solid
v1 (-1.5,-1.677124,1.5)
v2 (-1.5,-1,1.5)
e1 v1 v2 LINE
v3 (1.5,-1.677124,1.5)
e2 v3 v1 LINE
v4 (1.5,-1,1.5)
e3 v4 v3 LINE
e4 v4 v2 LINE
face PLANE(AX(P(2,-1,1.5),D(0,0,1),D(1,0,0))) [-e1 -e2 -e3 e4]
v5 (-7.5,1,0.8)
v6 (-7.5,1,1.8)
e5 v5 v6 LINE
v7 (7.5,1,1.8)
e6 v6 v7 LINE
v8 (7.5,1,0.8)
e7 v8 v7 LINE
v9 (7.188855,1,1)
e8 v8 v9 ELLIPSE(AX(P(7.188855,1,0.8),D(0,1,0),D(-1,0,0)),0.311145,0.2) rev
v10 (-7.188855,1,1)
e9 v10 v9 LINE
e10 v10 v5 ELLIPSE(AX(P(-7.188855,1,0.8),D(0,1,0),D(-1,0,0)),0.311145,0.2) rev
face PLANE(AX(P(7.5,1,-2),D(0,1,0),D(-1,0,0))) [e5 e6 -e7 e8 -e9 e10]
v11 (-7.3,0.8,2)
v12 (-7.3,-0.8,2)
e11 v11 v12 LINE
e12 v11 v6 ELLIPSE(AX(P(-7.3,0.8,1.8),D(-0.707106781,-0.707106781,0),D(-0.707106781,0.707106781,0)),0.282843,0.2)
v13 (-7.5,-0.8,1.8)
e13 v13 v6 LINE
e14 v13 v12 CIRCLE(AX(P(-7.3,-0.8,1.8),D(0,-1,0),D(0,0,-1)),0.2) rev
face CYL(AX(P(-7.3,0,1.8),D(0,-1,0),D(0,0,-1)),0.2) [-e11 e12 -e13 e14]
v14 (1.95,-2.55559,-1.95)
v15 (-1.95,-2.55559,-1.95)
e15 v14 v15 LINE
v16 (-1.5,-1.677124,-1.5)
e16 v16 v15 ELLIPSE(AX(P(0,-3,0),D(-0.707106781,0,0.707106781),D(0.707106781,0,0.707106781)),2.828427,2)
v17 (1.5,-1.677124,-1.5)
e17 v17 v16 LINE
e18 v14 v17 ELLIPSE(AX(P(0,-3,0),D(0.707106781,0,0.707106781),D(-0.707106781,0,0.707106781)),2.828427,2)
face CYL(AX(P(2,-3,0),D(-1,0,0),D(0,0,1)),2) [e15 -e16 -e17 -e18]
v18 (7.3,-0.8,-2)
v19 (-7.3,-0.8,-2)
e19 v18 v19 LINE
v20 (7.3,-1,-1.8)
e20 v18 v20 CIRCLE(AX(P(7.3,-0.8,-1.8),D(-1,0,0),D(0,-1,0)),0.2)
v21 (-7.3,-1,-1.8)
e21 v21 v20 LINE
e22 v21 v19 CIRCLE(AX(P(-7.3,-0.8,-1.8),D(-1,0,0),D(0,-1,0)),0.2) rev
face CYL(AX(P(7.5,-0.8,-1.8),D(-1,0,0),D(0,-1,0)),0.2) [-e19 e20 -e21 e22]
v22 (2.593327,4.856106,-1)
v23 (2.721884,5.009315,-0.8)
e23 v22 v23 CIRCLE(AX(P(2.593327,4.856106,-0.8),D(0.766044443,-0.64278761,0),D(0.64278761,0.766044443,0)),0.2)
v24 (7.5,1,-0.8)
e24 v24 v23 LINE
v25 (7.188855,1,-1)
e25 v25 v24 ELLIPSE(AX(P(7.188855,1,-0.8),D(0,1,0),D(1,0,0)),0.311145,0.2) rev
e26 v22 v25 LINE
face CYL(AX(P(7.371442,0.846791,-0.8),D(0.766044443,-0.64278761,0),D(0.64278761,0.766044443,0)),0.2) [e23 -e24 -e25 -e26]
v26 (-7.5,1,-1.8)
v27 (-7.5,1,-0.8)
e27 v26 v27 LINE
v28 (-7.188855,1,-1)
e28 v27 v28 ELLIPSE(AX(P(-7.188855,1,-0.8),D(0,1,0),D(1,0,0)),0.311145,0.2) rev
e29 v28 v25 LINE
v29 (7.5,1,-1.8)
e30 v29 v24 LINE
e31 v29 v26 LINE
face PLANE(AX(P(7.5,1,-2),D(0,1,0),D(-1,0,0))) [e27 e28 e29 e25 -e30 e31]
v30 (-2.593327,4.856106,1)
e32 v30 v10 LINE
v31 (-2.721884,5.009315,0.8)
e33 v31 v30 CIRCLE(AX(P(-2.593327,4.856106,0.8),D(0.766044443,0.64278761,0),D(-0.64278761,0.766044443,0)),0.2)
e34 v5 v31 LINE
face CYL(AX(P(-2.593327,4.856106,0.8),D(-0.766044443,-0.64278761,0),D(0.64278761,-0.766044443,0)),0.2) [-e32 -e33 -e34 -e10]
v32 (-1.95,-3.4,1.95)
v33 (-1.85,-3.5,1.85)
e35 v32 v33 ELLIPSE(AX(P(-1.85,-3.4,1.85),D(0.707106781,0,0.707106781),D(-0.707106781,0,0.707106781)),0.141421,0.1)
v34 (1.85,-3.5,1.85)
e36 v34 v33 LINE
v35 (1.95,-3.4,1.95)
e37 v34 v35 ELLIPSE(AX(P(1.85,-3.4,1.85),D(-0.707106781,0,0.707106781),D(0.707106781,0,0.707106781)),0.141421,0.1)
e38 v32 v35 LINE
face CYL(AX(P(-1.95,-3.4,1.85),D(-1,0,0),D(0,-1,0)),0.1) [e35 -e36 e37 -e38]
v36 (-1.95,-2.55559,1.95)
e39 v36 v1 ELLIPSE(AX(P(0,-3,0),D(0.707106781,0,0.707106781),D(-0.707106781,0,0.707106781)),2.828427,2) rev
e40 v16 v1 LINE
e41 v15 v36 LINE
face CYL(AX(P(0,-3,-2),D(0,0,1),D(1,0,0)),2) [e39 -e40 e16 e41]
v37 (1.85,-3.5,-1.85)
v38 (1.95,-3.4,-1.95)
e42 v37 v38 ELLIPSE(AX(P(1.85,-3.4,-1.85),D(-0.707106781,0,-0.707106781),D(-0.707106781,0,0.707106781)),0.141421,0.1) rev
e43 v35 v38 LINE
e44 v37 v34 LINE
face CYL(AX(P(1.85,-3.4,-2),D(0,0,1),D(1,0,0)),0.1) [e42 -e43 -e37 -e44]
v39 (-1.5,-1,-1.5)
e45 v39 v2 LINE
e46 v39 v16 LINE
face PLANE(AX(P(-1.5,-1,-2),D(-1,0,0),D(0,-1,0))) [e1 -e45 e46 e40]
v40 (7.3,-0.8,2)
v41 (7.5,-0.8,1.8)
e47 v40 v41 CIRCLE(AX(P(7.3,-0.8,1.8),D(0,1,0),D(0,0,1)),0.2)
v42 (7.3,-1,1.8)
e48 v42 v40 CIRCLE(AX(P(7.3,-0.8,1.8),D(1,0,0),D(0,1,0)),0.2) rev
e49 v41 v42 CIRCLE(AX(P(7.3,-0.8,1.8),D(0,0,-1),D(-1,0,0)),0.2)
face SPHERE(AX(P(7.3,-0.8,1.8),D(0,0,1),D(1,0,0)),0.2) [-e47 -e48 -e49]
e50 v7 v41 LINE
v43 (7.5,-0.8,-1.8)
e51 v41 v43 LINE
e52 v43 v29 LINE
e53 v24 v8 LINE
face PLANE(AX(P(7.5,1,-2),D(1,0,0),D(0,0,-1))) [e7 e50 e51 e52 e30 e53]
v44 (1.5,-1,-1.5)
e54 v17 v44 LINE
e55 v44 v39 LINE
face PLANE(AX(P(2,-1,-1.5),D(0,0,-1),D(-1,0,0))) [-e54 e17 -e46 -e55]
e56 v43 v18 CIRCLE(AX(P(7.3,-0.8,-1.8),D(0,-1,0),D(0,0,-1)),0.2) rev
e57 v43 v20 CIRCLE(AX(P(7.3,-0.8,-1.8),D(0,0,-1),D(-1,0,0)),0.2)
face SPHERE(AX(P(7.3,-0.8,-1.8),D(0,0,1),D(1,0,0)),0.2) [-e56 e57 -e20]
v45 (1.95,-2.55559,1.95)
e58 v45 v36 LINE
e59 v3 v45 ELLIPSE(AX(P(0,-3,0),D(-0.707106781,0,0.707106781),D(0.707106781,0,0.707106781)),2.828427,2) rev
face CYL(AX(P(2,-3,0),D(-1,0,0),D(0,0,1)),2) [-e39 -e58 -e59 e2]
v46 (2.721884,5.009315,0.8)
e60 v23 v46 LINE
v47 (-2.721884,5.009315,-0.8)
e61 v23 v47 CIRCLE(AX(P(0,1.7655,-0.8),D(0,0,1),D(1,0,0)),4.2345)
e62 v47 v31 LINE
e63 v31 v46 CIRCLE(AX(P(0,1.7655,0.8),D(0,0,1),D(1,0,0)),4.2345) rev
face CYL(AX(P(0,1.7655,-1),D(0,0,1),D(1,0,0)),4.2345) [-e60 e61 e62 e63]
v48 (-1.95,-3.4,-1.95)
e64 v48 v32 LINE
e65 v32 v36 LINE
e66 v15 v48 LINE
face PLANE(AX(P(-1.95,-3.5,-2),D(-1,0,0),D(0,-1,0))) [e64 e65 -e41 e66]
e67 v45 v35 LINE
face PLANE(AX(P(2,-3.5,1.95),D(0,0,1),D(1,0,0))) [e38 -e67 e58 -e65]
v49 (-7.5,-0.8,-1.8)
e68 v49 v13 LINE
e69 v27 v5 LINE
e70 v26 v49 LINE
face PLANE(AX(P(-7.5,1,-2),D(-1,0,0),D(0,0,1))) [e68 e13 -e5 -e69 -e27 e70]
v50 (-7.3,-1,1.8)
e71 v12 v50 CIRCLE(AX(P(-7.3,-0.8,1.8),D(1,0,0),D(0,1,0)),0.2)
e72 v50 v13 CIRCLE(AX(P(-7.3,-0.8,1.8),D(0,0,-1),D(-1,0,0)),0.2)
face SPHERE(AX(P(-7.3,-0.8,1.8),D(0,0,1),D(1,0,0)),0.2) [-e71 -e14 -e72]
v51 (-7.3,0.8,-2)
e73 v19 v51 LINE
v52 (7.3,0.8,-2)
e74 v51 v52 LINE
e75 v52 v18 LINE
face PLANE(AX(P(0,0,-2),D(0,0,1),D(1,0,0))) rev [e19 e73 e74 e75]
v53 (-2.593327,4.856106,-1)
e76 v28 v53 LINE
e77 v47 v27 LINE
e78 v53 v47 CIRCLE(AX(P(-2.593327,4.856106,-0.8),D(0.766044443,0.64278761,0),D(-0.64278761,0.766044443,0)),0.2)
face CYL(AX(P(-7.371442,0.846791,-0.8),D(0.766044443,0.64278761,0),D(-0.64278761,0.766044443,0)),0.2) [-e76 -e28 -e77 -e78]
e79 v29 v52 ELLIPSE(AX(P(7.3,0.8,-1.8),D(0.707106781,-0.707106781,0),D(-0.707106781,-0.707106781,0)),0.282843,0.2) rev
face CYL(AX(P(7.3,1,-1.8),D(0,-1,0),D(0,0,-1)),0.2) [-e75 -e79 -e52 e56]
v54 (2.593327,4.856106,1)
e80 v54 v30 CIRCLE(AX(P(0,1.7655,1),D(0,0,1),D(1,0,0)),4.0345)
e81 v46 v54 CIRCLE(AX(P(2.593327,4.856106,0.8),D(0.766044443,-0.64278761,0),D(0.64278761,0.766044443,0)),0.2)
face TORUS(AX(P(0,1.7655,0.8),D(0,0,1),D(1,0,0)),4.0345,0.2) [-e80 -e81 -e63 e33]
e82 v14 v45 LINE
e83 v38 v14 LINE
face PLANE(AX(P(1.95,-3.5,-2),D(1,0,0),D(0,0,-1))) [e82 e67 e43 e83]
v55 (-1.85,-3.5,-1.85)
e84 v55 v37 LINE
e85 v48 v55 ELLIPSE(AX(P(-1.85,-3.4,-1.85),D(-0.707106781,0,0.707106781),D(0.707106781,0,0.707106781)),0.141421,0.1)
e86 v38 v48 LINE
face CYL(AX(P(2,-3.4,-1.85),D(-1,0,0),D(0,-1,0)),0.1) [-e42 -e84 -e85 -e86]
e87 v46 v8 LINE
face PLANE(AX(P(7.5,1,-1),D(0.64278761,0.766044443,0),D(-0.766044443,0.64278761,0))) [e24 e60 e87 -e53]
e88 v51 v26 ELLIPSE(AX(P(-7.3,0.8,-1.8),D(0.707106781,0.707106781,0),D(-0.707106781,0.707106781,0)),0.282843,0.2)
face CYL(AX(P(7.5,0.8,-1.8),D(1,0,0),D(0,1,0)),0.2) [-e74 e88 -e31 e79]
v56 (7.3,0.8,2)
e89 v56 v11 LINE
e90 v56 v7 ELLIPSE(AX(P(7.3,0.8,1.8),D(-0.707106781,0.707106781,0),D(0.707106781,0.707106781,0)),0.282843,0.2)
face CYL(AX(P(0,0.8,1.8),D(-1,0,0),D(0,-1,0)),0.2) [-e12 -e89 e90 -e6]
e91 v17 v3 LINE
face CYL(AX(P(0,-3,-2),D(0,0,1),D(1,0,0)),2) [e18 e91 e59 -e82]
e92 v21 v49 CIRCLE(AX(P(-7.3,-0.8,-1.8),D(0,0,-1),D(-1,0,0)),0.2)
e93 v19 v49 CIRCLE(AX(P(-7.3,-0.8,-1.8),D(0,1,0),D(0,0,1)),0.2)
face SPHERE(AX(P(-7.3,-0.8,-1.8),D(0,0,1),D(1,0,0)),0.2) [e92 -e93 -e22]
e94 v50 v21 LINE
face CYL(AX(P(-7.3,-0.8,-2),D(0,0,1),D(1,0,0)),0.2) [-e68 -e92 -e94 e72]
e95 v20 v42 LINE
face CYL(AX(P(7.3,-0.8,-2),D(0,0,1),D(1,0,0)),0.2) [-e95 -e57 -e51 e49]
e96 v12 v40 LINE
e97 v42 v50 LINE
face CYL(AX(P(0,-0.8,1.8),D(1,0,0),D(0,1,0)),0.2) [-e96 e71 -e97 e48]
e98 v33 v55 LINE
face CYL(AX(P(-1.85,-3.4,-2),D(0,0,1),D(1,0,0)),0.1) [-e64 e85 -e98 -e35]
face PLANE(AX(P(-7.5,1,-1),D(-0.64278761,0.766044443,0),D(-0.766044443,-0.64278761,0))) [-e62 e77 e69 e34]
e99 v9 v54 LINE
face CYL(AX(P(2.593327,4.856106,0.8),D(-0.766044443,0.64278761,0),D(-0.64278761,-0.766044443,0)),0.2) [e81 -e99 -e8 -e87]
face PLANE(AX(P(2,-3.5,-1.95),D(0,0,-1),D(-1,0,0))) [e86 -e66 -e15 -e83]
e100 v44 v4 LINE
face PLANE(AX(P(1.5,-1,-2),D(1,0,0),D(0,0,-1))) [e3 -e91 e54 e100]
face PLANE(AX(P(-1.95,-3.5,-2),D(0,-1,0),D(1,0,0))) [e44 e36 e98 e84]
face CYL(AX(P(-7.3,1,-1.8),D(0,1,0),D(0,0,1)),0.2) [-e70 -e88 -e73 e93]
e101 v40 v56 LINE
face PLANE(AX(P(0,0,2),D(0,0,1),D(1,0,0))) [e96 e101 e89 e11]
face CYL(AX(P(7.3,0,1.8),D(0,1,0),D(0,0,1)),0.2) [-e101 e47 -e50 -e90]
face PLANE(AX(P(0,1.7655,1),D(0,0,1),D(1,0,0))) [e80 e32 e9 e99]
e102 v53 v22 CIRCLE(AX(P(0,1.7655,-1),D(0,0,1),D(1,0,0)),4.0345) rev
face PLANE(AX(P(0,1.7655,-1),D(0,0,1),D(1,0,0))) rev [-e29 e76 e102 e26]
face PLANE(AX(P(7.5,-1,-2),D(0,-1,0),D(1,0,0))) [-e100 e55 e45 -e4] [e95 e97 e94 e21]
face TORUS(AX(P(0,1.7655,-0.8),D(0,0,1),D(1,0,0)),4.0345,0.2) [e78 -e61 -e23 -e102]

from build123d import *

# Parameters (mm, degrees)
EXTRUDE_1_DEPTH          = 2
EXTRUDE_1_DEPTH_BACK     = 2
SKETCH_1_W               = 15
SKETCH_1_H               = 2
EXTRUDE_2_DEPTH          = 2
EXTRUDE_2_DEPTH_BACK     = 2
CUT_EXTRUDE_1_DEPTH      = 2
CUT_EXTRUDE_1_DEPTH_BACK = 2
EXTRUDE_3_DEPTH          = 1
EXTRUDE_3_DEPTH_BACK     = 1
FILLET_2_R               = 0.2
FILLET_4_R               = 0.2
FILLET_5_R               = 0.2
FILLET_7_R               = 0.1


with BuildPart() as part:
    # 草图1 → 凸台-拉伸1 (new, two sides: drawn at the far end of the back side and taken through both)
    with BuildSketch(Plane.XY.offset(-EXTRUDE_1_DEPTH_BACK)):
        Rectangle(SKETCH_1_W, SKETCH_1_H)
    extrude(amount=EXTRUDE_1_DEPTH + EXTRUDE_1_DEPTH_BACK)

    # 草图2 → 凸台-拉伸2 (add, two sides: drawn at the far end of the back side and taken through both)
    with BuildSketch(Plane.XY.offset(-EXTRUDE_2_DEPTH_BACK)):
        with BuildLine():
            Line((-1.5, -1), (1.5, -1))
            Line((1.5, -1), (1.5, -1.677124344))
            ThreePointArc((1.5, -1.677124344), (1.780042303, -2.088161527), (1.95, -2.555590279))
            Line((1.95, -2.555590279), (1.95, -3.5))
            Line((1.95, -3.5), (-1.95, -3.5))
            Line((-1.95, -3.5), (-1.95, -2.555590279))
            ThreePointArc((-1.95, -2.555590279), (-1.780042303, -2.088161527), (-1.5, -1.677124344))
            Line((-1.5, -1.677124344), (-1.5, -1))
        make_face()
    extrude(amount=EXTRUDE_2_DEPTH + EXTRUDE_2_DEPTH_BACK)

    # 草图3 → 切除-拉伸1 (cut, two sides: drawn at the far end of the back side and taken through both)
    with BuildSketch(Plane(origin=(0, 0, 0), x_dir=(0, 0, -1), z_dir=(1, 0, 0)).offset(-CUT_EXTRUDE_1_DEPTH_BACK)):
        with BuildLine():
            Line((1.5, -1), (1.5, -1.677124344))
            ThreePointArc((1.5, -1.677124344), (1.780042303, -2.088161527), (1.95, -2.555590279))
            Line((1.95, -2.555590279), (1.95, -3.5))
            Line((1.95, -3.5), (2, -3.5))
            Line((2, -3.5), (2, -1))
            Line((2, -1), (1.5, -1))
        make_face()
        with BuildLine():
            Line((-2, -1), (-1.5, -1))
            Line((-1.5, -1), (-1.5, -1.677124344))
            ThreePointArc((-1.5, -1.677124344), (-1.780042303, -2.088161527), (-1.95, -2.555590279))
            Line((-1.95, -2.555590279), (-1.95, -3.5))
            Line((-1.95, -3.5), (-2, -3.5))
            Line((-2, -3.5), (-2, -1))
        make_face()
    extrude(amount=CUT_EXTRUDE_1_DEPTH + CUT_EXTRUDE_1_DEPTH_BACK, mode=Mode.SUBTRACT)

    # 草图4 → 凸台-拉伸3 (add, two sides: drawn at the far end of the back side and taken through both)
    with BuildSketch(Plane.XY.offset(-EXTRUDE_3_DEPTH_BACK)):
        with BuildLine():
            Line((7.5, 1), (-7.5, 1))
            Line((-7.5, 1), (-2.721884275, 5.009315143))
            ThreePointArc((-2.721884275, 5.009315143), (0, 6), (2.721884275, 5.009315143))
            Line((2.721884275, 5.009315143), (7.5, 1))
        make_face()
    extrude(amount=EXTRUDE_3_DEPTH + EXTRUDE_3_DEPTH_BACK)

    # 圆角2
    fillet_2_edges = [part.edges().sort_by_distance(p)[0] for p in [
        (0, 1, -2),
        (-7.5, 0, -2),
        (0, -1, -2),
        (7.5, 0, -2),
        (-7.5, 0, 2),
        (0, 1, 2),
        (7.5, 0, 2),
        (0, -1, 2),
    ]]
    fillet(fillet_2_edges, radius=FILLET_2_R)

    # 圆角4
    # the kernel refuses this fillet: 0.2 mm, written as the material it takes off along each edge
    with BuildSketch(Plane(origin=(7.3, -0.8, -1.8), x_dir=(0, -1, 0), z_dir=(1, 0, 0))) as fillet_4_piece_1_section:
        Polygon((0, 0), (FILLET_4_R, 0), (FILLET_4_R, FILLET_4_R), (0, FILLET_4_R), align=None)
    fillet_4_piece_1 = extrude(amount=FILLET_4_R, mode=Mode.PRIVATE)
    fillet_4_piece_1 = fillet_4_piece_1 - Plane(origin=(7.3, -0.8, -1.8), x_dir=(0, 0.7071067811865475, 0.7071067811865475), z_dir=(1, 0, 0)) * Sphere(FILLET_4_R, mode=Mode.PRIVATE)
    add(fillet_4_piece_1, mode=Mode.SUBTRACT)
    with BuildSketch(Plane(origin=(-7.3, -0.8, -1.8), x_dir=(-1, 0, 0), z_dir=(0, -1, 0))) as fillet_4_piece_2_section:
        Polygon((0, 0), (FILLET_4_R, 0), (FILLET_4_R, FILLET_4_R), (0, FILLET_4_R), align=None)
    fillet_4_piece_2 = extrude(amount=FILLET_4_R, mode=Mode.PRIVATE)
    fillet_4_piece_2 = fillet_4_piece_2 - Plane(origin=(-7.3, -0.8, -1.8), x_dir=(0.7071067811865475, 0, 0.7071067811865475), z_dir=(0, -1, 0)) * Sphere(FILLET_4_R, mode=Mode.PRIVATE)
    add(fillet_4_piece_2, mode=Mode.SUBTRACT)
    with BuildSketch(Plane(origin=(7.3, -0.8, 1.8), x_dir=(0, -1, 0), z_dir=(1, 0, 0))) as fillet_4_piece_3_section:
        Polygon((0, 0), (FILLET_4_R, 0), (FILLET_4_R, -FILLET_4_R), (0, -FILLET_4_R), align=None)
    fillet_4_piece_3 = extrude(amount=FILLET_4_R, mode=Mode.PRIVATE)
    fillet_4_piece_3 = fillet_4_piece_3 - Plane(origin=(7.3, -0.8, 1.8), x_dir=(0, 0.7071067811865475, -0.7071067811865475), z_dir=(1, 0, 0)) * Sphere(FILLET_4_R, mode=Mode.PRIVATE)
    add(fillet_4_piece_3, mode=Mode.SUBTRACT)
    with BuildSketch(Plane(origin=(-7.3, -0.8, 1.8), x_dir=(-1, 0, 0), z_dir=(0, -1, 0))) as fillet_4_piece_4_section:
        Polygon((0, 0), (FILLET_4_R, 0), (FILLET_4_R, -FILLET_4_R), (0, -FILLET_4_R), align=None)
    fillet_4_piece_4 = extrude(amount=FILLET_4_R, mode=Mode.PRIVATE)
    fillet_4_piece_4 = fillet_4_piece_4 - Plane(origin=(-7.3, -0.8, 1.8), x_dir=(0.7071067811865475, 0, -0.7071067811865475), z_dir=(0, -1, 0)) * Sphere(FILLET_4_R, mode=Mode.PRIVATE)
    add(fillet_4_piece_4, mode=Mode.SUBTRACT)
    with BuildSketch(Plane(origin=(-7.5, -1, 1.8), x_dir=(1, 0, 0), z_dir=(0, 0, -1)), Plane(origin=(7.5, -1, 1.8), x_dir=(0, 1, 0), z_dir=(0, 0, -1))) as fillet_4_piece_5:
        with BuildLine():
            CenterArc((FILLET_4_R, -FILLET_4_R), FILLET_4_R, 90, 90)
            Line((0, -FILLET_4_R), (0, 0))
            Line((0, 0), (FILLET_4_R, 0))
        make_face()
    extrude(amount=3.6, mode=Mode.SUBTRACT)

    # 圆角5
    fillet_5_edges = [part.edges().sort_by_distance(p)[0] for p in [
        (5.110942137, 3.004657571, -1),
        (0, 6, -1),
        (5.110942137, 3.004657571, 1),
        (0, 6, 1),
        (-5.110942137, 3.004657571, -1),
        (-5.110942137, 3.004657571, 1),
    ]]
    fillet(fillet_5_edges, radius=FILLET_5_R)

    # 圆角7
    fillet_7_edges = [part.edges().sort_by_distance(p)[0] for p in [
        (0, -3.5, 1.95),
        (1.95, -3.5, 0),
        (-1.95, -3.5, 0),
        (0, -3.5, -1.95),
    ]]
    fillet(fillet_7_edges, radius=FILLET_7_R)


solid = part.part
